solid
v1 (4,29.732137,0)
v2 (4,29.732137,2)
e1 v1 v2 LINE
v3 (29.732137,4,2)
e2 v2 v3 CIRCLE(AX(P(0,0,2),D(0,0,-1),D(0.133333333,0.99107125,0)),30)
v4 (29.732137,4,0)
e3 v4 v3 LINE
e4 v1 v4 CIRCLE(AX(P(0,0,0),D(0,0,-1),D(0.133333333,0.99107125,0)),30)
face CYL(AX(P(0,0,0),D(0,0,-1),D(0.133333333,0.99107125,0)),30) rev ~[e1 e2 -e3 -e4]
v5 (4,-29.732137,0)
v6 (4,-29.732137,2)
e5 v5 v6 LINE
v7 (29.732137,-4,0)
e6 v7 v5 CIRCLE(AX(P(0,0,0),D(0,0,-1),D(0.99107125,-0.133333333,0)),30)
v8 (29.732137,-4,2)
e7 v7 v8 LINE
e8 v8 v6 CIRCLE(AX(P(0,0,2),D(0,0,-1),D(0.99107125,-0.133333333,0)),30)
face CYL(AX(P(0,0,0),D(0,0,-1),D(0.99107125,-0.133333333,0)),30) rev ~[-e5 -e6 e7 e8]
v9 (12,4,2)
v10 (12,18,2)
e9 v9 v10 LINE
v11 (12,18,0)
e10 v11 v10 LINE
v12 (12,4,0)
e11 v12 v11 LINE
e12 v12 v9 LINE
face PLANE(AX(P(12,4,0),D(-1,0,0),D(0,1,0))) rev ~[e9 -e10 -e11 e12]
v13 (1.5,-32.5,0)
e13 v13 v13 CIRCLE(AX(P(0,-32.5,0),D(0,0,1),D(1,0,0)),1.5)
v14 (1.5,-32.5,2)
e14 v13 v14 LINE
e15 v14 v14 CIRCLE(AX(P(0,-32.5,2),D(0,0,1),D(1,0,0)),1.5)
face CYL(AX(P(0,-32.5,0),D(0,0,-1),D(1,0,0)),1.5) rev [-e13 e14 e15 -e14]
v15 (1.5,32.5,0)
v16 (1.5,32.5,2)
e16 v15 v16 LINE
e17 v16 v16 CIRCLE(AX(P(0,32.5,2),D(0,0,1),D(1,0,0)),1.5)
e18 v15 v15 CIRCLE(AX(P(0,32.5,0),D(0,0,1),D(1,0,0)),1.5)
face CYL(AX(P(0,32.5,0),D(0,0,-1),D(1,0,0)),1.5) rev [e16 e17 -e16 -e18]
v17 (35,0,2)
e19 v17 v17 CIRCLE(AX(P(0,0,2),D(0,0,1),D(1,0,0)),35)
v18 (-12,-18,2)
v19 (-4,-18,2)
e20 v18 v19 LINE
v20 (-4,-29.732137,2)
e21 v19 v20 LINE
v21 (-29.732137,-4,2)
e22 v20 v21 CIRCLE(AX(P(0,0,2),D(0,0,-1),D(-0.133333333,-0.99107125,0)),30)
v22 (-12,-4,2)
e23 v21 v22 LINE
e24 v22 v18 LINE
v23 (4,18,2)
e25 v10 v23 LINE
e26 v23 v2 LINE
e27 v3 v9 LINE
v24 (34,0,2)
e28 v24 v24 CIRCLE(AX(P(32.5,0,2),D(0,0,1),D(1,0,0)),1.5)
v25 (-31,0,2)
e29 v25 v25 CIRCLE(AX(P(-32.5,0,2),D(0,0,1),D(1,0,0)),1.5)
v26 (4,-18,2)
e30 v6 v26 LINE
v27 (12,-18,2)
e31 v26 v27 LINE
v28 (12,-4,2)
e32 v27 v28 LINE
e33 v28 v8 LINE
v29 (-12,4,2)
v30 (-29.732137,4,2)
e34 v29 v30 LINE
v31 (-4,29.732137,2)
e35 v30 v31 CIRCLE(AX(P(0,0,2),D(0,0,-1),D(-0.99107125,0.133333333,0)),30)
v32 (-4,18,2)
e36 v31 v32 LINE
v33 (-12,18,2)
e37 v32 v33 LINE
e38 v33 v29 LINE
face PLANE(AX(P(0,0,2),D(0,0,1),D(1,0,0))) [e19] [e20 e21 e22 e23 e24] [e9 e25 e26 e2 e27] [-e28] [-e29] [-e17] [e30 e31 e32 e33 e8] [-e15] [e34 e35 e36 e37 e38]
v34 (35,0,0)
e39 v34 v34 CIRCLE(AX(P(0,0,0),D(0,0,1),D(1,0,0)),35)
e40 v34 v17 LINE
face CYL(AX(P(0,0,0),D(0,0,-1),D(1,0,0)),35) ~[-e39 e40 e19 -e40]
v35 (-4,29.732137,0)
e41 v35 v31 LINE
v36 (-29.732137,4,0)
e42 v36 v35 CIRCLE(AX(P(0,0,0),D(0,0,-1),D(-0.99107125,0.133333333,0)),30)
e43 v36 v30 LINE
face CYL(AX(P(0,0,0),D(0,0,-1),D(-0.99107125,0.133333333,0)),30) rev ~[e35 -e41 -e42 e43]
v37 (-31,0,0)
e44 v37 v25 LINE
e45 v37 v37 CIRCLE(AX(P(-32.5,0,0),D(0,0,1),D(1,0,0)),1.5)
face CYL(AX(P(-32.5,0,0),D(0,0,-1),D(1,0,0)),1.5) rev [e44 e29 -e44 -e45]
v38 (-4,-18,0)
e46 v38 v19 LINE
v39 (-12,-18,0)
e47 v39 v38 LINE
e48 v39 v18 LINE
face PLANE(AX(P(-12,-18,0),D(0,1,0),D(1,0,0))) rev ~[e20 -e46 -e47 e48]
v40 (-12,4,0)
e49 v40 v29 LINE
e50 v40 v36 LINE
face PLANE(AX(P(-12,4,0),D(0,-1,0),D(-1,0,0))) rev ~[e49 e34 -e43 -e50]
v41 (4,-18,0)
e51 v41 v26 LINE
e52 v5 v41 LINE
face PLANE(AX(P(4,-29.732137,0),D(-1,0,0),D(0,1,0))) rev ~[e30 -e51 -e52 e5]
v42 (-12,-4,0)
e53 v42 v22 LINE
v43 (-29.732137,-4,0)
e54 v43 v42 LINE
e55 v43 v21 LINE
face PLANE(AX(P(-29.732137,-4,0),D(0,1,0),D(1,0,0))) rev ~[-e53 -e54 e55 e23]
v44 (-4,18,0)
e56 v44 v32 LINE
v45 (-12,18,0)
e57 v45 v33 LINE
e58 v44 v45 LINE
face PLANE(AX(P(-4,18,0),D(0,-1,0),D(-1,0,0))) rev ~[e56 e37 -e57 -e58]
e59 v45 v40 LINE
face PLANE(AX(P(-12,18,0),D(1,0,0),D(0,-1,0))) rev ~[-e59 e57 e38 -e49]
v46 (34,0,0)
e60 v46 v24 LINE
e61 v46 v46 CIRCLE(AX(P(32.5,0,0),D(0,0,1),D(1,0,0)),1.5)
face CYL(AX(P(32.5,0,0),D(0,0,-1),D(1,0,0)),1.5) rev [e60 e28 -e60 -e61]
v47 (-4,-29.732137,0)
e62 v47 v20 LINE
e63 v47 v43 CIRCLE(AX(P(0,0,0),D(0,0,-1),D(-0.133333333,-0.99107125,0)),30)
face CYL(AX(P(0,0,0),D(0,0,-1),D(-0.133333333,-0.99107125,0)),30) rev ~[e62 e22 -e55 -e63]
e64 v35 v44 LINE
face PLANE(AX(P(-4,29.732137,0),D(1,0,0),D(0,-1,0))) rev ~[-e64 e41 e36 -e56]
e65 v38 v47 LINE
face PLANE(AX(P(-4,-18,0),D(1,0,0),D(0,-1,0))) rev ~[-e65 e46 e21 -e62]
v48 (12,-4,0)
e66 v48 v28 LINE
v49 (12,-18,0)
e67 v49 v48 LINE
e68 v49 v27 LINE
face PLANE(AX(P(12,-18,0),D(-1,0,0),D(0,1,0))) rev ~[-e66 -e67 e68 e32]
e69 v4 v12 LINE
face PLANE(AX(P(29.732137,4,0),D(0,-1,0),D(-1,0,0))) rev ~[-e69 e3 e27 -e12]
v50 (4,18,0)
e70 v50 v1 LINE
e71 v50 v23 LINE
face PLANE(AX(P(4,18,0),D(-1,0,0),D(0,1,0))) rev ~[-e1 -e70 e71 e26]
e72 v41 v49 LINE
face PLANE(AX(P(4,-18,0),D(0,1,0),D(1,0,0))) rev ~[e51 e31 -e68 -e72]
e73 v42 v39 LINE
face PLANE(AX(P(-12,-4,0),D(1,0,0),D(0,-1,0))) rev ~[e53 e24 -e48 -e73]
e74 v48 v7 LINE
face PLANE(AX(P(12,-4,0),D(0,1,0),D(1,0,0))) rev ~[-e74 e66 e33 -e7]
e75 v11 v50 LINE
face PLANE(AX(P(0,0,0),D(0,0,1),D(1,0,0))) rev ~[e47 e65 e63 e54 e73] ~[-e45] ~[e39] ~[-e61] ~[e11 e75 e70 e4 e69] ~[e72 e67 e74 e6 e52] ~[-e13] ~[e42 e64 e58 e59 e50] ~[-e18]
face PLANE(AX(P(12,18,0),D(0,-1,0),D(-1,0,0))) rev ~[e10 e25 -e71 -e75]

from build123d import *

# Parameters (mm, degrees)
F0_R     = 35
F0_R_2   = 1.5
F0_W     = 19.983293198
F0_H     = 32
F1_DEPTH = 2


# Not quite as in the source:
# - a feature names something its author has since deleted; it is built from what else it names


with BuildPart() as f1:
    # F0 (on Top) → F1 (new body)
    with BuildSketch(Plane.XY):
        Circle(F0_R)
        with Locations((0, -32.5)):
            Circle(F0_R_2, mode=Mode.SUBTRACT)
        with Locations((-32.5, 0)):
            Circle(F0_R_2, mode=Mode.SUBTRACT)
        with BuildLine():
            ThreePointArc((29.7321374946, 4), (29.9329594664, 2.0044793789), (30, 0))
            ThreePointArc((30, 0), (29.9329594664, -2.0044793789), (29.7321374946, -4))
            ThreePointArc((29.7321374946, -4), (21.2132034356, -21.2132034356), (4, -29.7321374946))
            ThreePointArc((4, -29.7321374946), (0, -30), (-4, -29.7321374946))
            ThreePointArc((-4, -29.7321374946), (-21.2132034356, -21.2132034356), (-29.7321374946, -4))
            ThreePointArc((-29.7321374946, -4), (-30, 0), (-29.7321374946, 4))
            ThreePointArc((-29.7321374946, 4), (-21.2132034356, 21.2132034356), (-4, 29.7321374946))
            ThreePointArc((-4, 29.7321374946), (0, 30), (4, 29.7321374946))
            ThreePointArc((4, 29.7321374946), (21.2132034356, 21.2132034356), (29.7321374946, 4))
        make_face(mode=Mode.SUBTRACT)
        with Locations((32.5, 0)):
            Circle(F0_R_2, mode=Mode.SUBTRACT)
        with Locations((0, 32.5)):
            Circle(F0_R_2, mode=Mode.SUBTRACT)
        with BuildLine():
            Line((4, 18), (4, 29.7321374946))
            ThreePointArc((4, 29.7321374946), (0, 30), (-4, 29.7321374946))
            Line((-4, 29.7321374946), (-4, 18))
            Line((-4, 18), (4, 18))
        make_face()
        with BuildLine():
            Line((-12, 4), (-29.7321374946, 4))
            ThreePointArc((-29.7321374946, 4), (-30, 0), (-29.7321374946, -4))
            Line((-29.7321374946, -4), (-12, -4))
            Line((-12, -4), (-12, 4))
        make_face()
        with BuildLine():
            ThreePointArc((-4, -29.7321374946), (0, -30), (4, -29.7321374946))
            Line((4, -29.7321374946), (4, -18))
            Line((4, -18), (-4, -18))
            Line((-4, -18), (-4, -29.7321374946))
        make_face()
        Polygon((12, -4), (12, 4), (12, 12.1005004627), (12, 18), (4, 18), (-4, 18), (-12, 18), (-12, 4), (-12, -4), (-12, -18), (-4, -18), (4, -18), (12, -18), (12, -5.151443038), align=None)
        with Locations((0.1530251862, 0.242334145)):
            Rectangle(F0_W, F0_H, mode=Mode.SUBTRACT)
        with Locations((0.1530251862, 0.242334145)):
            Rectangle(F0_W, F0_H)
        with BuildLine():
            ThreePointArc((29.7321374946, -4), (29.9329594664, -2.0044793789), (30, 0))
            ThreePointArc((30, 0), (29.9329594664, 2.0044793789), (29.7321374946, 4))
            Line((29.7321374946, 4), (12, 4))
            Line((12, 4), (12, -4))
            Line((12, -4), (29.7321374946, -4))
        make_face()
    extrude(amount=F1_DEPTH)


solid = f1.part
